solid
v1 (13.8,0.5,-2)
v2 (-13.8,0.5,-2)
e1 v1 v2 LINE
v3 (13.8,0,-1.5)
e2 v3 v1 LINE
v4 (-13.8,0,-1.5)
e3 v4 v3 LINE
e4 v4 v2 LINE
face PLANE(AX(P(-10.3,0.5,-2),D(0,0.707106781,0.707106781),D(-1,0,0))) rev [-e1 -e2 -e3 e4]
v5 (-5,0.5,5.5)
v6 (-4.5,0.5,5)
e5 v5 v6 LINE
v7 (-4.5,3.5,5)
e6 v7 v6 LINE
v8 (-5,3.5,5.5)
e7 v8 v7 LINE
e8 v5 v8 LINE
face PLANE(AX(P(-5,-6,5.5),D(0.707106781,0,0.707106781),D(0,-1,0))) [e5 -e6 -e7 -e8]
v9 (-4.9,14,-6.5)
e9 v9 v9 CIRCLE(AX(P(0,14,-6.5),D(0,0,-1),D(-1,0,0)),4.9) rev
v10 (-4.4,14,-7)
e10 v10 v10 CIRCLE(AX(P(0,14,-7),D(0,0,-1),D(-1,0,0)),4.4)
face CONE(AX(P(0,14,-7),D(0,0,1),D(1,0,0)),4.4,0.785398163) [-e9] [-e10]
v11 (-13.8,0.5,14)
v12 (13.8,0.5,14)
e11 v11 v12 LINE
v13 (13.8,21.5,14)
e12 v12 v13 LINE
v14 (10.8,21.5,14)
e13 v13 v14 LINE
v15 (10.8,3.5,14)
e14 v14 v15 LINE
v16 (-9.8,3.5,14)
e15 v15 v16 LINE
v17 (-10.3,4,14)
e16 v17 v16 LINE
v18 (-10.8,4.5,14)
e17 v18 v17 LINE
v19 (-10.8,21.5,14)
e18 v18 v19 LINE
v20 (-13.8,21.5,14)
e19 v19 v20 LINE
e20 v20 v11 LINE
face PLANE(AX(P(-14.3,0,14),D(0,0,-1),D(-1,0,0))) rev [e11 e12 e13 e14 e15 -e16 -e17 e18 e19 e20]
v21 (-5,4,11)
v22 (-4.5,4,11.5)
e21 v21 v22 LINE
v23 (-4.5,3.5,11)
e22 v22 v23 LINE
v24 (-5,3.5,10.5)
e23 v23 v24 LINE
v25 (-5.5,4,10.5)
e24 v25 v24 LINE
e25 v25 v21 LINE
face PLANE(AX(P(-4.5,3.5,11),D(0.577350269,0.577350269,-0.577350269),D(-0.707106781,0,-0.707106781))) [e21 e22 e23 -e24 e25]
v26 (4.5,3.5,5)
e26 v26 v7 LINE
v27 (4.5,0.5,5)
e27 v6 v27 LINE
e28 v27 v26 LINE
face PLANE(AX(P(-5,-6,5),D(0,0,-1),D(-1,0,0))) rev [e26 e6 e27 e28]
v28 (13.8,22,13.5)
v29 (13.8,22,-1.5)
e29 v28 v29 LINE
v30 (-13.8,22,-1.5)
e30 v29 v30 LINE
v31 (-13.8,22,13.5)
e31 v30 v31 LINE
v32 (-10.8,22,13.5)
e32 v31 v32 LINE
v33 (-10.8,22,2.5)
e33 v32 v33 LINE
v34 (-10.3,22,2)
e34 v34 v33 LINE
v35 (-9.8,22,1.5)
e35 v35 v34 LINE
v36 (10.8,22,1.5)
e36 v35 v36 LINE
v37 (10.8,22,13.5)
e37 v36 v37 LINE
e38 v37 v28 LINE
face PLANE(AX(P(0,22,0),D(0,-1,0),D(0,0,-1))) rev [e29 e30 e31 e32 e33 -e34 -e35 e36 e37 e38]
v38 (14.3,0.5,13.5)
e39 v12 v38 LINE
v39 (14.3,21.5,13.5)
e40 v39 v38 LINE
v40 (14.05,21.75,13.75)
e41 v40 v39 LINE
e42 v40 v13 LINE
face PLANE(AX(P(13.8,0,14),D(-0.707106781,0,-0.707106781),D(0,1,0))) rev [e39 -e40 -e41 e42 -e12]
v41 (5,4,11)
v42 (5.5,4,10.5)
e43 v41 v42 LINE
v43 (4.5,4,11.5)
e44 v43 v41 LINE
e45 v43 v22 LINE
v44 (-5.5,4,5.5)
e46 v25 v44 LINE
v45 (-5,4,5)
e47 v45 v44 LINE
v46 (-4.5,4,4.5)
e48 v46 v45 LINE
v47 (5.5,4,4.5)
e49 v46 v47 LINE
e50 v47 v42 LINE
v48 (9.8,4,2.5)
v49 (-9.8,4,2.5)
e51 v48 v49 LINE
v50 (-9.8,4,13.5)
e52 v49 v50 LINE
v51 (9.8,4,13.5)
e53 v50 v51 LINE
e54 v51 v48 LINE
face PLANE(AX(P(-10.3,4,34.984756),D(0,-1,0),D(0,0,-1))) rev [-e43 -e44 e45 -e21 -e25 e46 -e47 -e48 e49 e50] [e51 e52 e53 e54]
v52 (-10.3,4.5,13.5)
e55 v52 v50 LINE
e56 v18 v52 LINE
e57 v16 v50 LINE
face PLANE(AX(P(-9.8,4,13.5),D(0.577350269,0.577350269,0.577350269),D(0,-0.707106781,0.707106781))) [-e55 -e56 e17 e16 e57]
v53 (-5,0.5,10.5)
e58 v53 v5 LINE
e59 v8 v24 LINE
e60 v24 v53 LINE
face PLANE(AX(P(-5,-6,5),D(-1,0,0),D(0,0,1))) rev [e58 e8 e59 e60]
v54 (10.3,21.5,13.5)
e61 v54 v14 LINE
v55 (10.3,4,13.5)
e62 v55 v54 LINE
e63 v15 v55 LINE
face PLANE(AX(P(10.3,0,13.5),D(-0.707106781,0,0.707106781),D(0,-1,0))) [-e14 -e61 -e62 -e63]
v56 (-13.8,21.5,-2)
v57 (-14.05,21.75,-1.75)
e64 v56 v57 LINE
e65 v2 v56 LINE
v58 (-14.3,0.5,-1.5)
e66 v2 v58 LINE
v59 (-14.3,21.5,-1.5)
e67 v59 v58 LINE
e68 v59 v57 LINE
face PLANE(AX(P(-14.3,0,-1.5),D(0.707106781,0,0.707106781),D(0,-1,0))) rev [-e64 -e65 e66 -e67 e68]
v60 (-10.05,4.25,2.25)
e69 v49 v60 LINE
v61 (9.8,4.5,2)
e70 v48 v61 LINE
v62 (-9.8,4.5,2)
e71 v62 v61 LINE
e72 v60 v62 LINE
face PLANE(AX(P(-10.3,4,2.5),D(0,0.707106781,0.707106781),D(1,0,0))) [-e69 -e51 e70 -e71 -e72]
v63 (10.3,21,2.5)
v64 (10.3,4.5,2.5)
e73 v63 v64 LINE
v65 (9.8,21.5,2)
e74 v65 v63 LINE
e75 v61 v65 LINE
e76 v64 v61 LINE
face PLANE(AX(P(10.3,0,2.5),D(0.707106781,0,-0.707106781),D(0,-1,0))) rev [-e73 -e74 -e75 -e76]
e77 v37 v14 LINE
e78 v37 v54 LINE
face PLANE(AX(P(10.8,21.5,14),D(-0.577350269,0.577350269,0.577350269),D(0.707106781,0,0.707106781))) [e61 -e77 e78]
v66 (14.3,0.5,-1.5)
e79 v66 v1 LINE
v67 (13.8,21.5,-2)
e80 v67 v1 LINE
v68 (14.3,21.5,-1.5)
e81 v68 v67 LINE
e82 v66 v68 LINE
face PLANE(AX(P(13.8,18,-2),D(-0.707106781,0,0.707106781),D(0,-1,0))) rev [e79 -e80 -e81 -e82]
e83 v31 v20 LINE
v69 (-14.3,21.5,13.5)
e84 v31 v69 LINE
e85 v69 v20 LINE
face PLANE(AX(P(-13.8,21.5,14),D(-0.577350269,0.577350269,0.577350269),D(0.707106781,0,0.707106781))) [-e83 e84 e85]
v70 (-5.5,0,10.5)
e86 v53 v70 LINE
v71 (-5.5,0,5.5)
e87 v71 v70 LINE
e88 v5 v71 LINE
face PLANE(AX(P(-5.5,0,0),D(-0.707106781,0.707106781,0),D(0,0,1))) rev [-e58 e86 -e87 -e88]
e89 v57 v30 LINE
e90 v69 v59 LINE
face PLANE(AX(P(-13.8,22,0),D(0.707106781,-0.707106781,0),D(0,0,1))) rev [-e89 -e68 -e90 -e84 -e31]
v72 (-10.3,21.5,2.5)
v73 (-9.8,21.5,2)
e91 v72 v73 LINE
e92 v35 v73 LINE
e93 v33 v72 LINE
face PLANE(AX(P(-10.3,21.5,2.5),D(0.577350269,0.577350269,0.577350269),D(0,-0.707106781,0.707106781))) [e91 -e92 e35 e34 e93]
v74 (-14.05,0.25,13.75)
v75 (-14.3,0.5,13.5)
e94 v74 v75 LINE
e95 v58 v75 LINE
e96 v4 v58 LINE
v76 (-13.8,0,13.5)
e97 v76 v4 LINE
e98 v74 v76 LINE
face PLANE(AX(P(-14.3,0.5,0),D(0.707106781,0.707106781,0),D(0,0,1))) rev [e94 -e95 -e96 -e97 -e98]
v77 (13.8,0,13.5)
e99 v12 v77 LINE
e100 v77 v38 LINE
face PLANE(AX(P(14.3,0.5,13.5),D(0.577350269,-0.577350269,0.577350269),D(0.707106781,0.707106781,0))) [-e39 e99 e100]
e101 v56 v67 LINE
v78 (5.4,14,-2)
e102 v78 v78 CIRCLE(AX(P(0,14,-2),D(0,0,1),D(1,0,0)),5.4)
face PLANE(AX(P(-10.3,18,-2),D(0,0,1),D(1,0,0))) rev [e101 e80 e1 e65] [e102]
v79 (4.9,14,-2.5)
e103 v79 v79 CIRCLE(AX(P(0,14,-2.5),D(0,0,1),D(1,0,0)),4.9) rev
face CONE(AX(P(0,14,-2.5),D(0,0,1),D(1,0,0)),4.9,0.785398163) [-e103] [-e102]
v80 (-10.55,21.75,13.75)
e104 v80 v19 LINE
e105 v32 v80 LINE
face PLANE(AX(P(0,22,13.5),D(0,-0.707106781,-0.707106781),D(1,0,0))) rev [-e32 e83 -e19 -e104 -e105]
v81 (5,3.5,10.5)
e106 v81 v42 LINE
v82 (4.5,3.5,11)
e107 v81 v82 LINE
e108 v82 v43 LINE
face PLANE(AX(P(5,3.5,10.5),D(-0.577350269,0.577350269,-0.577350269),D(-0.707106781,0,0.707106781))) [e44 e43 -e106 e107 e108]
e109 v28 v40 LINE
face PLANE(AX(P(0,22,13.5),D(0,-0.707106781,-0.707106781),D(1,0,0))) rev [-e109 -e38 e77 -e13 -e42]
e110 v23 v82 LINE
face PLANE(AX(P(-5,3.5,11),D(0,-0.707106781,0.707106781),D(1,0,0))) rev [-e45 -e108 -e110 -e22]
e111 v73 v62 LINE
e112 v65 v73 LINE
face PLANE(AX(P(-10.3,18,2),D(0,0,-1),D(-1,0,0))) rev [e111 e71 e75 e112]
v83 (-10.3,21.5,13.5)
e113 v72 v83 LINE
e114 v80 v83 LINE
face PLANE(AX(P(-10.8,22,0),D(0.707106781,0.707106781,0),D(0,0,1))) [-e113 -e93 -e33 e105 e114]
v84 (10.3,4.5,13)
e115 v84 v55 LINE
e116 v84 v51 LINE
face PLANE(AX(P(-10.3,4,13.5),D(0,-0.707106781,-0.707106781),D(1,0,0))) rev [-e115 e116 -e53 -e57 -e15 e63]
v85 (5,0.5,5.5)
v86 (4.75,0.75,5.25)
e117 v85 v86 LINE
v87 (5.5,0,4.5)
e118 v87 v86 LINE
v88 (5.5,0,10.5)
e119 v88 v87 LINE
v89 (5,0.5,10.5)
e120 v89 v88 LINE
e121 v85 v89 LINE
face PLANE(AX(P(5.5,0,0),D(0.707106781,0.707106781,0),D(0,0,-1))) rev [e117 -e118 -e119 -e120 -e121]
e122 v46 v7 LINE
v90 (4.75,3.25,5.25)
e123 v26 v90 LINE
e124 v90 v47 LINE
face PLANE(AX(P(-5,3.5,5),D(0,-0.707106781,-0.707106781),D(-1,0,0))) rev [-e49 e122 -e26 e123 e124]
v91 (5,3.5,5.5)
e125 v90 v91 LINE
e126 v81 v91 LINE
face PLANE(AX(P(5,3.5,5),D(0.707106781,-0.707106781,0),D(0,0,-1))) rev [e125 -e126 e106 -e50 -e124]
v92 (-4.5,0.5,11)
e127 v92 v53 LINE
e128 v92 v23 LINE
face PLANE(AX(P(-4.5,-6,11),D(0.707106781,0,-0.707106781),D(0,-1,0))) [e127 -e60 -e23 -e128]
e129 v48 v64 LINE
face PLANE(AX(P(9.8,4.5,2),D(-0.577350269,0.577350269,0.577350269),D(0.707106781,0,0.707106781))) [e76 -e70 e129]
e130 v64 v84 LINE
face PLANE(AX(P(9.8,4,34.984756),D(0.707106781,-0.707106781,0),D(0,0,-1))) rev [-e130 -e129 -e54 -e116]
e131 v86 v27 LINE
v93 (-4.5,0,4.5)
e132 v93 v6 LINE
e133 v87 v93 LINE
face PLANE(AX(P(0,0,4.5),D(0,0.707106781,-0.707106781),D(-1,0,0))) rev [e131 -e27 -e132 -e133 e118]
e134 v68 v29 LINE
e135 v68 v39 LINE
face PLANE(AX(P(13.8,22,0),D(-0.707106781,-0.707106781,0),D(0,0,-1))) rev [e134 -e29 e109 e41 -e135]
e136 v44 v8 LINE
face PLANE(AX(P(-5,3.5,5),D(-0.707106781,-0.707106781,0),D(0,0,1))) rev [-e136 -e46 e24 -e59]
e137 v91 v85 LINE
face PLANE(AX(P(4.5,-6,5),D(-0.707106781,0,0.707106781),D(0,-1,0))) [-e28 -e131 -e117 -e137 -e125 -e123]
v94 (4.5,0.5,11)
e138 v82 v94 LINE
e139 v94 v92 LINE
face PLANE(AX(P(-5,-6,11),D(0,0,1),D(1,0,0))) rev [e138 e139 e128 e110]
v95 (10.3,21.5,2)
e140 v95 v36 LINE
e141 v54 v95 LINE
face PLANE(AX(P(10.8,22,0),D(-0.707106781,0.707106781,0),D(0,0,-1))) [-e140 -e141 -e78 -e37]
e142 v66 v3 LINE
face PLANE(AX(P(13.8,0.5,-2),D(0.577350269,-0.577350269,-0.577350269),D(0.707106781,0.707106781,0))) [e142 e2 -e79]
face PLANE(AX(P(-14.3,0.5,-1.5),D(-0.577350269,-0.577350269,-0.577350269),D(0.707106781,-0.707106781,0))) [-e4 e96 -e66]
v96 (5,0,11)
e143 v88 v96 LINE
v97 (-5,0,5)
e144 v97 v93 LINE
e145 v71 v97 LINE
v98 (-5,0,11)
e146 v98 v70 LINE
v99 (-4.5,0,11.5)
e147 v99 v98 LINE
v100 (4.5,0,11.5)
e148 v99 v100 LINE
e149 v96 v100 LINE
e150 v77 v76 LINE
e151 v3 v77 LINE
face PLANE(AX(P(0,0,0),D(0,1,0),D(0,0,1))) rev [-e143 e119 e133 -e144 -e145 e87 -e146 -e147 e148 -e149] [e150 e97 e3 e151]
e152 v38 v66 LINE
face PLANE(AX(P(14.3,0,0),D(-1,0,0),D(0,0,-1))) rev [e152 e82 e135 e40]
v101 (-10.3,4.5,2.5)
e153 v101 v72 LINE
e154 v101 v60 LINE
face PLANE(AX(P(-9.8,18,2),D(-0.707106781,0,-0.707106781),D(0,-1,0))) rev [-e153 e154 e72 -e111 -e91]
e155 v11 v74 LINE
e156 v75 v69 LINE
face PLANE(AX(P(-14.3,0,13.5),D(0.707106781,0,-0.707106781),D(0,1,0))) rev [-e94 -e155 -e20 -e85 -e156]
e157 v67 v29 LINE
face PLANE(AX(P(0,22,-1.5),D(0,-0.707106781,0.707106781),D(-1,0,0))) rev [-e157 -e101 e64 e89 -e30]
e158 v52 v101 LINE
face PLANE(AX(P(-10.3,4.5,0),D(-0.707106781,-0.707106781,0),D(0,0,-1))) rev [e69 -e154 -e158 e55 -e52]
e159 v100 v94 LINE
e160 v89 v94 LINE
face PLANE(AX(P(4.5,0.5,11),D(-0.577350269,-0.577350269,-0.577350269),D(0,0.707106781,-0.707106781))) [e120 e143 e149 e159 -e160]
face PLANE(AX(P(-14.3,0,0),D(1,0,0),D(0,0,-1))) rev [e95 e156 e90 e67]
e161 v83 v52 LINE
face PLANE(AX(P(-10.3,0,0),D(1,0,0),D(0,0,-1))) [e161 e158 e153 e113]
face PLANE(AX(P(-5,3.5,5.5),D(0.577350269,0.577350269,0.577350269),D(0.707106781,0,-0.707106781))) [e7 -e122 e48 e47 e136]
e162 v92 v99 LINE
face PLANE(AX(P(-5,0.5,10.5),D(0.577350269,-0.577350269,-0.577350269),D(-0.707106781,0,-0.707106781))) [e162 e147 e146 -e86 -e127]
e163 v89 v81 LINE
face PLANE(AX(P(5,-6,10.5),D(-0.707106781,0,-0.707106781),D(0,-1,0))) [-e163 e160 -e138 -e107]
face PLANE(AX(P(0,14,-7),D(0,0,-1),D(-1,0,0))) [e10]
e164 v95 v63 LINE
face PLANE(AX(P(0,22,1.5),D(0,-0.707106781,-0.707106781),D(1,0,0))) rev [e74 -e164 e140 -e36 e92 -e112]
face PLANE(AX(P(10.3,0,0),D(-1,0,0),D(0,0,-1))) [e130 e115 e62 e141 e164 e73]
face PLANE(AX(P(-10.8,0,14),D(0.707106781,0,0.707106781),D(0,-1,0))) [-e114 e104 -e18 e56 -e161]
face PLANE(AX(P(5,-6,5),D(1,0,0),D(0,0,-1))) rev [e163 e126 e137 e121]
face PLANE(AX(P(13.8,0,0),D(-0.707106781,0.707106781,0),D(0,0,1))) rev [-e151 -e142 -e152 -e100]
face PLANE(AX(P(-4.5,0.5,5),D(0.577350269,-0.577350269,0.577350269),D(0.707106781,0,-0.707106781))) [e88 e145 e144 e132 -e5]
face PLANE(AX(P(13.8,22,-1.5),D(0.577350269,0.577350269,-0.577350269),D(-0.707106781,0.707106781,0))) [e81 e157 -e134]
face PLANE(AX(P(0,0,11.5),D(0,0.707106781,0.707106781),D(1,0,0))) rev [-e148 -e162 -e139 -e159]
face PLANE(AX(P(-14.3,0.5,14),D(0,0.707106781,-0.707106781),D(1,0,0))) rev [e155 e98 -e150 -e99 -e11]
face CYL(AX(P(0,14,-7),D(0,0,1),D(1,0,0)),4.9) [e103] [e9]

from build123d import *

# Parameters (mm, degrees)
SKETCH1_W           = 20.6
SKETCH1_H           = 4
BOSS_EXTRUDE1_DEPTH = 18
SKETCH2_W           = 16
SKETCH2_H           = 18
BOSS_EXTRUDE3_DEPTH = 4
SKETCH3_W           = 20.6
SKETCH3_H           = 4
BOSS_EXTRUDE4_DEPTH = 12
SKETCH4_R           = 4.9
BOSS_EXTRUDE5_DEPTH = 5
SKETCH5_W           = 10
SKETCH5_H           = 6
CUT_EXTRUDE1_DEPTH  = 10
BOSS_EXTRUDE6_DEPTH = 4
CHAMFER1_SIZE       = 0.5
CHAMFER2_SIZE       = 0.5


with BuildPart() as part:
    # Sketch1 → Boss-Extrude1 (new body)
    with BuildSketch(Plane(origin=(0, 0, 0), x_dir=(1, 0, 0), z_dir=(0, 1, 0))):
        Rectangle(SKETCH1_W, SKETCH1_H)
    extrude(amount=BOSS_EXTRUDE1_DEPTH)

    # Sketch2 → Boss-Extrude3 (add)
    with BuildSketch(Plane.ZY.offset(10.3)):
        with Locations((6, 9)):
            Rectangle(SKETCH2_W, SKETCH2_H)
    boss_extrude3 = extrude(amount=BOSS_EXTRUDE3_DEPTH)

    # Mirror1: Boss-Extrude3 across plane
    add(boss_extrude3.mirror(Plane.ZY))

    # Sketch3 → Boss-Extrude4 (add)
    with BuildSketch(Plane.XY.offset(2)):
        with Locations((0, 2)):
            Rectangle(SKETCH3_W, SKETCH3_H)
    extrude(amount=BOSS_EXTRUDE4_DEPTH)

    # Sketch4 → Boss-Extrude5 (add)
    with BuildSketch(Plane(origin=(0, 0, -2), x_dir=(-1, 0, 0), z_dir=(0, 0, -1))):
        with Locations(Location((0, 14, 0), (0, 0, 125.281261827))):
            Circle(SKETCH4_R)
    extrude(amount=BOSS_EXTRUDE5_DEPTH)

    # Sketch5 → Cut-Extrude1 (cut)
    with BuildSketch(Plane(origin=(0, 4, 0), x_dir=(1, 0, 0), z_dir=(0, 1, 0))):
        with Locations((0, -8)):
            Rectangle(SKETCH5_W, SKETCH5_H)
    extrude(amount=-CUT_EXTRUDE1_DEPTH, mode=Mode.SUBTRACT)

    # Sketch6 → Boss-Extrude6 (add)
    with BuildSketch(Plane(origin=(0, 18, 0), x_dir=(1, 0, 0), z_dir=(0, 1, 0))):
        Polygon((-10.3, -2), (10.3, -2), (10.3, -14), (14.3, -14), (14.3, 2), (2.83019434, 2), (-2.83019434, 2), (-14.3, 2), (-14.3, -14), (-10.3, -14), align=None)
    extrude(amount=BOSS_EXTRUDE6_DEPTH)

    # Chamfer1
    chamfer1_edges = [part.edges().sort_by_distance(p)[0] for p in [
        (0, 0, 14),
        (-14.3, 11, -2),
        (-14.3, 0, 6),
        (14.3, 11, -2),
        (14.3, 11, 14),
        (14.3, 0, 6),
        (-10.3, 13, 14),
        (0, 4, 14),
        (-10.3, 4, 8),
        (0, 0, -2),
        (-2.83019434, 10, -2),
        (-2.83019434, 10, -7),
        (5, 0, 8),
        (0, 0, 11),
        (5, 2, 11),
        (-5, 0, 8),
        (-5, 2, 11),
        (0, 0, 5),
        (-5, 2, 5),
        (5, 4, 8),
        (0, 4, 5),
        (-5, 4, 8),
        (0, 4, 11),
        (-10.3, 13, 2),
        (-10.3, 22, 8),
        (0, 22, 2),
        (14.3, 22, 6),
        (0, 22, -2),
    ]]
    chamfer(chamfer1_edges, length=CHAMFER1_SIZE)

    # Chamfer2
    chamfer2_edges = [part.edges().sort_by_distance(p)[0] for p in [
        (5, 2, 5),
        (10.3, 4, 7.75),
        (-14.3, 22, 6.25),
        (-14.3, 11.25, 14),
        (10.3, 12.75, 2),
        (10.3, 12.75, 14),
        (0.25, 4, 2),
        (10.3, 22, 7.75),
        (12.05, 22, 14),
        (-12.55, 22, 14),
    ]]
    chamfer(chamfer2_edges, length=CHAMFER2_SIZE - 0.0001)  # a hair under: the kernel refuses the full size


solid = part.part
